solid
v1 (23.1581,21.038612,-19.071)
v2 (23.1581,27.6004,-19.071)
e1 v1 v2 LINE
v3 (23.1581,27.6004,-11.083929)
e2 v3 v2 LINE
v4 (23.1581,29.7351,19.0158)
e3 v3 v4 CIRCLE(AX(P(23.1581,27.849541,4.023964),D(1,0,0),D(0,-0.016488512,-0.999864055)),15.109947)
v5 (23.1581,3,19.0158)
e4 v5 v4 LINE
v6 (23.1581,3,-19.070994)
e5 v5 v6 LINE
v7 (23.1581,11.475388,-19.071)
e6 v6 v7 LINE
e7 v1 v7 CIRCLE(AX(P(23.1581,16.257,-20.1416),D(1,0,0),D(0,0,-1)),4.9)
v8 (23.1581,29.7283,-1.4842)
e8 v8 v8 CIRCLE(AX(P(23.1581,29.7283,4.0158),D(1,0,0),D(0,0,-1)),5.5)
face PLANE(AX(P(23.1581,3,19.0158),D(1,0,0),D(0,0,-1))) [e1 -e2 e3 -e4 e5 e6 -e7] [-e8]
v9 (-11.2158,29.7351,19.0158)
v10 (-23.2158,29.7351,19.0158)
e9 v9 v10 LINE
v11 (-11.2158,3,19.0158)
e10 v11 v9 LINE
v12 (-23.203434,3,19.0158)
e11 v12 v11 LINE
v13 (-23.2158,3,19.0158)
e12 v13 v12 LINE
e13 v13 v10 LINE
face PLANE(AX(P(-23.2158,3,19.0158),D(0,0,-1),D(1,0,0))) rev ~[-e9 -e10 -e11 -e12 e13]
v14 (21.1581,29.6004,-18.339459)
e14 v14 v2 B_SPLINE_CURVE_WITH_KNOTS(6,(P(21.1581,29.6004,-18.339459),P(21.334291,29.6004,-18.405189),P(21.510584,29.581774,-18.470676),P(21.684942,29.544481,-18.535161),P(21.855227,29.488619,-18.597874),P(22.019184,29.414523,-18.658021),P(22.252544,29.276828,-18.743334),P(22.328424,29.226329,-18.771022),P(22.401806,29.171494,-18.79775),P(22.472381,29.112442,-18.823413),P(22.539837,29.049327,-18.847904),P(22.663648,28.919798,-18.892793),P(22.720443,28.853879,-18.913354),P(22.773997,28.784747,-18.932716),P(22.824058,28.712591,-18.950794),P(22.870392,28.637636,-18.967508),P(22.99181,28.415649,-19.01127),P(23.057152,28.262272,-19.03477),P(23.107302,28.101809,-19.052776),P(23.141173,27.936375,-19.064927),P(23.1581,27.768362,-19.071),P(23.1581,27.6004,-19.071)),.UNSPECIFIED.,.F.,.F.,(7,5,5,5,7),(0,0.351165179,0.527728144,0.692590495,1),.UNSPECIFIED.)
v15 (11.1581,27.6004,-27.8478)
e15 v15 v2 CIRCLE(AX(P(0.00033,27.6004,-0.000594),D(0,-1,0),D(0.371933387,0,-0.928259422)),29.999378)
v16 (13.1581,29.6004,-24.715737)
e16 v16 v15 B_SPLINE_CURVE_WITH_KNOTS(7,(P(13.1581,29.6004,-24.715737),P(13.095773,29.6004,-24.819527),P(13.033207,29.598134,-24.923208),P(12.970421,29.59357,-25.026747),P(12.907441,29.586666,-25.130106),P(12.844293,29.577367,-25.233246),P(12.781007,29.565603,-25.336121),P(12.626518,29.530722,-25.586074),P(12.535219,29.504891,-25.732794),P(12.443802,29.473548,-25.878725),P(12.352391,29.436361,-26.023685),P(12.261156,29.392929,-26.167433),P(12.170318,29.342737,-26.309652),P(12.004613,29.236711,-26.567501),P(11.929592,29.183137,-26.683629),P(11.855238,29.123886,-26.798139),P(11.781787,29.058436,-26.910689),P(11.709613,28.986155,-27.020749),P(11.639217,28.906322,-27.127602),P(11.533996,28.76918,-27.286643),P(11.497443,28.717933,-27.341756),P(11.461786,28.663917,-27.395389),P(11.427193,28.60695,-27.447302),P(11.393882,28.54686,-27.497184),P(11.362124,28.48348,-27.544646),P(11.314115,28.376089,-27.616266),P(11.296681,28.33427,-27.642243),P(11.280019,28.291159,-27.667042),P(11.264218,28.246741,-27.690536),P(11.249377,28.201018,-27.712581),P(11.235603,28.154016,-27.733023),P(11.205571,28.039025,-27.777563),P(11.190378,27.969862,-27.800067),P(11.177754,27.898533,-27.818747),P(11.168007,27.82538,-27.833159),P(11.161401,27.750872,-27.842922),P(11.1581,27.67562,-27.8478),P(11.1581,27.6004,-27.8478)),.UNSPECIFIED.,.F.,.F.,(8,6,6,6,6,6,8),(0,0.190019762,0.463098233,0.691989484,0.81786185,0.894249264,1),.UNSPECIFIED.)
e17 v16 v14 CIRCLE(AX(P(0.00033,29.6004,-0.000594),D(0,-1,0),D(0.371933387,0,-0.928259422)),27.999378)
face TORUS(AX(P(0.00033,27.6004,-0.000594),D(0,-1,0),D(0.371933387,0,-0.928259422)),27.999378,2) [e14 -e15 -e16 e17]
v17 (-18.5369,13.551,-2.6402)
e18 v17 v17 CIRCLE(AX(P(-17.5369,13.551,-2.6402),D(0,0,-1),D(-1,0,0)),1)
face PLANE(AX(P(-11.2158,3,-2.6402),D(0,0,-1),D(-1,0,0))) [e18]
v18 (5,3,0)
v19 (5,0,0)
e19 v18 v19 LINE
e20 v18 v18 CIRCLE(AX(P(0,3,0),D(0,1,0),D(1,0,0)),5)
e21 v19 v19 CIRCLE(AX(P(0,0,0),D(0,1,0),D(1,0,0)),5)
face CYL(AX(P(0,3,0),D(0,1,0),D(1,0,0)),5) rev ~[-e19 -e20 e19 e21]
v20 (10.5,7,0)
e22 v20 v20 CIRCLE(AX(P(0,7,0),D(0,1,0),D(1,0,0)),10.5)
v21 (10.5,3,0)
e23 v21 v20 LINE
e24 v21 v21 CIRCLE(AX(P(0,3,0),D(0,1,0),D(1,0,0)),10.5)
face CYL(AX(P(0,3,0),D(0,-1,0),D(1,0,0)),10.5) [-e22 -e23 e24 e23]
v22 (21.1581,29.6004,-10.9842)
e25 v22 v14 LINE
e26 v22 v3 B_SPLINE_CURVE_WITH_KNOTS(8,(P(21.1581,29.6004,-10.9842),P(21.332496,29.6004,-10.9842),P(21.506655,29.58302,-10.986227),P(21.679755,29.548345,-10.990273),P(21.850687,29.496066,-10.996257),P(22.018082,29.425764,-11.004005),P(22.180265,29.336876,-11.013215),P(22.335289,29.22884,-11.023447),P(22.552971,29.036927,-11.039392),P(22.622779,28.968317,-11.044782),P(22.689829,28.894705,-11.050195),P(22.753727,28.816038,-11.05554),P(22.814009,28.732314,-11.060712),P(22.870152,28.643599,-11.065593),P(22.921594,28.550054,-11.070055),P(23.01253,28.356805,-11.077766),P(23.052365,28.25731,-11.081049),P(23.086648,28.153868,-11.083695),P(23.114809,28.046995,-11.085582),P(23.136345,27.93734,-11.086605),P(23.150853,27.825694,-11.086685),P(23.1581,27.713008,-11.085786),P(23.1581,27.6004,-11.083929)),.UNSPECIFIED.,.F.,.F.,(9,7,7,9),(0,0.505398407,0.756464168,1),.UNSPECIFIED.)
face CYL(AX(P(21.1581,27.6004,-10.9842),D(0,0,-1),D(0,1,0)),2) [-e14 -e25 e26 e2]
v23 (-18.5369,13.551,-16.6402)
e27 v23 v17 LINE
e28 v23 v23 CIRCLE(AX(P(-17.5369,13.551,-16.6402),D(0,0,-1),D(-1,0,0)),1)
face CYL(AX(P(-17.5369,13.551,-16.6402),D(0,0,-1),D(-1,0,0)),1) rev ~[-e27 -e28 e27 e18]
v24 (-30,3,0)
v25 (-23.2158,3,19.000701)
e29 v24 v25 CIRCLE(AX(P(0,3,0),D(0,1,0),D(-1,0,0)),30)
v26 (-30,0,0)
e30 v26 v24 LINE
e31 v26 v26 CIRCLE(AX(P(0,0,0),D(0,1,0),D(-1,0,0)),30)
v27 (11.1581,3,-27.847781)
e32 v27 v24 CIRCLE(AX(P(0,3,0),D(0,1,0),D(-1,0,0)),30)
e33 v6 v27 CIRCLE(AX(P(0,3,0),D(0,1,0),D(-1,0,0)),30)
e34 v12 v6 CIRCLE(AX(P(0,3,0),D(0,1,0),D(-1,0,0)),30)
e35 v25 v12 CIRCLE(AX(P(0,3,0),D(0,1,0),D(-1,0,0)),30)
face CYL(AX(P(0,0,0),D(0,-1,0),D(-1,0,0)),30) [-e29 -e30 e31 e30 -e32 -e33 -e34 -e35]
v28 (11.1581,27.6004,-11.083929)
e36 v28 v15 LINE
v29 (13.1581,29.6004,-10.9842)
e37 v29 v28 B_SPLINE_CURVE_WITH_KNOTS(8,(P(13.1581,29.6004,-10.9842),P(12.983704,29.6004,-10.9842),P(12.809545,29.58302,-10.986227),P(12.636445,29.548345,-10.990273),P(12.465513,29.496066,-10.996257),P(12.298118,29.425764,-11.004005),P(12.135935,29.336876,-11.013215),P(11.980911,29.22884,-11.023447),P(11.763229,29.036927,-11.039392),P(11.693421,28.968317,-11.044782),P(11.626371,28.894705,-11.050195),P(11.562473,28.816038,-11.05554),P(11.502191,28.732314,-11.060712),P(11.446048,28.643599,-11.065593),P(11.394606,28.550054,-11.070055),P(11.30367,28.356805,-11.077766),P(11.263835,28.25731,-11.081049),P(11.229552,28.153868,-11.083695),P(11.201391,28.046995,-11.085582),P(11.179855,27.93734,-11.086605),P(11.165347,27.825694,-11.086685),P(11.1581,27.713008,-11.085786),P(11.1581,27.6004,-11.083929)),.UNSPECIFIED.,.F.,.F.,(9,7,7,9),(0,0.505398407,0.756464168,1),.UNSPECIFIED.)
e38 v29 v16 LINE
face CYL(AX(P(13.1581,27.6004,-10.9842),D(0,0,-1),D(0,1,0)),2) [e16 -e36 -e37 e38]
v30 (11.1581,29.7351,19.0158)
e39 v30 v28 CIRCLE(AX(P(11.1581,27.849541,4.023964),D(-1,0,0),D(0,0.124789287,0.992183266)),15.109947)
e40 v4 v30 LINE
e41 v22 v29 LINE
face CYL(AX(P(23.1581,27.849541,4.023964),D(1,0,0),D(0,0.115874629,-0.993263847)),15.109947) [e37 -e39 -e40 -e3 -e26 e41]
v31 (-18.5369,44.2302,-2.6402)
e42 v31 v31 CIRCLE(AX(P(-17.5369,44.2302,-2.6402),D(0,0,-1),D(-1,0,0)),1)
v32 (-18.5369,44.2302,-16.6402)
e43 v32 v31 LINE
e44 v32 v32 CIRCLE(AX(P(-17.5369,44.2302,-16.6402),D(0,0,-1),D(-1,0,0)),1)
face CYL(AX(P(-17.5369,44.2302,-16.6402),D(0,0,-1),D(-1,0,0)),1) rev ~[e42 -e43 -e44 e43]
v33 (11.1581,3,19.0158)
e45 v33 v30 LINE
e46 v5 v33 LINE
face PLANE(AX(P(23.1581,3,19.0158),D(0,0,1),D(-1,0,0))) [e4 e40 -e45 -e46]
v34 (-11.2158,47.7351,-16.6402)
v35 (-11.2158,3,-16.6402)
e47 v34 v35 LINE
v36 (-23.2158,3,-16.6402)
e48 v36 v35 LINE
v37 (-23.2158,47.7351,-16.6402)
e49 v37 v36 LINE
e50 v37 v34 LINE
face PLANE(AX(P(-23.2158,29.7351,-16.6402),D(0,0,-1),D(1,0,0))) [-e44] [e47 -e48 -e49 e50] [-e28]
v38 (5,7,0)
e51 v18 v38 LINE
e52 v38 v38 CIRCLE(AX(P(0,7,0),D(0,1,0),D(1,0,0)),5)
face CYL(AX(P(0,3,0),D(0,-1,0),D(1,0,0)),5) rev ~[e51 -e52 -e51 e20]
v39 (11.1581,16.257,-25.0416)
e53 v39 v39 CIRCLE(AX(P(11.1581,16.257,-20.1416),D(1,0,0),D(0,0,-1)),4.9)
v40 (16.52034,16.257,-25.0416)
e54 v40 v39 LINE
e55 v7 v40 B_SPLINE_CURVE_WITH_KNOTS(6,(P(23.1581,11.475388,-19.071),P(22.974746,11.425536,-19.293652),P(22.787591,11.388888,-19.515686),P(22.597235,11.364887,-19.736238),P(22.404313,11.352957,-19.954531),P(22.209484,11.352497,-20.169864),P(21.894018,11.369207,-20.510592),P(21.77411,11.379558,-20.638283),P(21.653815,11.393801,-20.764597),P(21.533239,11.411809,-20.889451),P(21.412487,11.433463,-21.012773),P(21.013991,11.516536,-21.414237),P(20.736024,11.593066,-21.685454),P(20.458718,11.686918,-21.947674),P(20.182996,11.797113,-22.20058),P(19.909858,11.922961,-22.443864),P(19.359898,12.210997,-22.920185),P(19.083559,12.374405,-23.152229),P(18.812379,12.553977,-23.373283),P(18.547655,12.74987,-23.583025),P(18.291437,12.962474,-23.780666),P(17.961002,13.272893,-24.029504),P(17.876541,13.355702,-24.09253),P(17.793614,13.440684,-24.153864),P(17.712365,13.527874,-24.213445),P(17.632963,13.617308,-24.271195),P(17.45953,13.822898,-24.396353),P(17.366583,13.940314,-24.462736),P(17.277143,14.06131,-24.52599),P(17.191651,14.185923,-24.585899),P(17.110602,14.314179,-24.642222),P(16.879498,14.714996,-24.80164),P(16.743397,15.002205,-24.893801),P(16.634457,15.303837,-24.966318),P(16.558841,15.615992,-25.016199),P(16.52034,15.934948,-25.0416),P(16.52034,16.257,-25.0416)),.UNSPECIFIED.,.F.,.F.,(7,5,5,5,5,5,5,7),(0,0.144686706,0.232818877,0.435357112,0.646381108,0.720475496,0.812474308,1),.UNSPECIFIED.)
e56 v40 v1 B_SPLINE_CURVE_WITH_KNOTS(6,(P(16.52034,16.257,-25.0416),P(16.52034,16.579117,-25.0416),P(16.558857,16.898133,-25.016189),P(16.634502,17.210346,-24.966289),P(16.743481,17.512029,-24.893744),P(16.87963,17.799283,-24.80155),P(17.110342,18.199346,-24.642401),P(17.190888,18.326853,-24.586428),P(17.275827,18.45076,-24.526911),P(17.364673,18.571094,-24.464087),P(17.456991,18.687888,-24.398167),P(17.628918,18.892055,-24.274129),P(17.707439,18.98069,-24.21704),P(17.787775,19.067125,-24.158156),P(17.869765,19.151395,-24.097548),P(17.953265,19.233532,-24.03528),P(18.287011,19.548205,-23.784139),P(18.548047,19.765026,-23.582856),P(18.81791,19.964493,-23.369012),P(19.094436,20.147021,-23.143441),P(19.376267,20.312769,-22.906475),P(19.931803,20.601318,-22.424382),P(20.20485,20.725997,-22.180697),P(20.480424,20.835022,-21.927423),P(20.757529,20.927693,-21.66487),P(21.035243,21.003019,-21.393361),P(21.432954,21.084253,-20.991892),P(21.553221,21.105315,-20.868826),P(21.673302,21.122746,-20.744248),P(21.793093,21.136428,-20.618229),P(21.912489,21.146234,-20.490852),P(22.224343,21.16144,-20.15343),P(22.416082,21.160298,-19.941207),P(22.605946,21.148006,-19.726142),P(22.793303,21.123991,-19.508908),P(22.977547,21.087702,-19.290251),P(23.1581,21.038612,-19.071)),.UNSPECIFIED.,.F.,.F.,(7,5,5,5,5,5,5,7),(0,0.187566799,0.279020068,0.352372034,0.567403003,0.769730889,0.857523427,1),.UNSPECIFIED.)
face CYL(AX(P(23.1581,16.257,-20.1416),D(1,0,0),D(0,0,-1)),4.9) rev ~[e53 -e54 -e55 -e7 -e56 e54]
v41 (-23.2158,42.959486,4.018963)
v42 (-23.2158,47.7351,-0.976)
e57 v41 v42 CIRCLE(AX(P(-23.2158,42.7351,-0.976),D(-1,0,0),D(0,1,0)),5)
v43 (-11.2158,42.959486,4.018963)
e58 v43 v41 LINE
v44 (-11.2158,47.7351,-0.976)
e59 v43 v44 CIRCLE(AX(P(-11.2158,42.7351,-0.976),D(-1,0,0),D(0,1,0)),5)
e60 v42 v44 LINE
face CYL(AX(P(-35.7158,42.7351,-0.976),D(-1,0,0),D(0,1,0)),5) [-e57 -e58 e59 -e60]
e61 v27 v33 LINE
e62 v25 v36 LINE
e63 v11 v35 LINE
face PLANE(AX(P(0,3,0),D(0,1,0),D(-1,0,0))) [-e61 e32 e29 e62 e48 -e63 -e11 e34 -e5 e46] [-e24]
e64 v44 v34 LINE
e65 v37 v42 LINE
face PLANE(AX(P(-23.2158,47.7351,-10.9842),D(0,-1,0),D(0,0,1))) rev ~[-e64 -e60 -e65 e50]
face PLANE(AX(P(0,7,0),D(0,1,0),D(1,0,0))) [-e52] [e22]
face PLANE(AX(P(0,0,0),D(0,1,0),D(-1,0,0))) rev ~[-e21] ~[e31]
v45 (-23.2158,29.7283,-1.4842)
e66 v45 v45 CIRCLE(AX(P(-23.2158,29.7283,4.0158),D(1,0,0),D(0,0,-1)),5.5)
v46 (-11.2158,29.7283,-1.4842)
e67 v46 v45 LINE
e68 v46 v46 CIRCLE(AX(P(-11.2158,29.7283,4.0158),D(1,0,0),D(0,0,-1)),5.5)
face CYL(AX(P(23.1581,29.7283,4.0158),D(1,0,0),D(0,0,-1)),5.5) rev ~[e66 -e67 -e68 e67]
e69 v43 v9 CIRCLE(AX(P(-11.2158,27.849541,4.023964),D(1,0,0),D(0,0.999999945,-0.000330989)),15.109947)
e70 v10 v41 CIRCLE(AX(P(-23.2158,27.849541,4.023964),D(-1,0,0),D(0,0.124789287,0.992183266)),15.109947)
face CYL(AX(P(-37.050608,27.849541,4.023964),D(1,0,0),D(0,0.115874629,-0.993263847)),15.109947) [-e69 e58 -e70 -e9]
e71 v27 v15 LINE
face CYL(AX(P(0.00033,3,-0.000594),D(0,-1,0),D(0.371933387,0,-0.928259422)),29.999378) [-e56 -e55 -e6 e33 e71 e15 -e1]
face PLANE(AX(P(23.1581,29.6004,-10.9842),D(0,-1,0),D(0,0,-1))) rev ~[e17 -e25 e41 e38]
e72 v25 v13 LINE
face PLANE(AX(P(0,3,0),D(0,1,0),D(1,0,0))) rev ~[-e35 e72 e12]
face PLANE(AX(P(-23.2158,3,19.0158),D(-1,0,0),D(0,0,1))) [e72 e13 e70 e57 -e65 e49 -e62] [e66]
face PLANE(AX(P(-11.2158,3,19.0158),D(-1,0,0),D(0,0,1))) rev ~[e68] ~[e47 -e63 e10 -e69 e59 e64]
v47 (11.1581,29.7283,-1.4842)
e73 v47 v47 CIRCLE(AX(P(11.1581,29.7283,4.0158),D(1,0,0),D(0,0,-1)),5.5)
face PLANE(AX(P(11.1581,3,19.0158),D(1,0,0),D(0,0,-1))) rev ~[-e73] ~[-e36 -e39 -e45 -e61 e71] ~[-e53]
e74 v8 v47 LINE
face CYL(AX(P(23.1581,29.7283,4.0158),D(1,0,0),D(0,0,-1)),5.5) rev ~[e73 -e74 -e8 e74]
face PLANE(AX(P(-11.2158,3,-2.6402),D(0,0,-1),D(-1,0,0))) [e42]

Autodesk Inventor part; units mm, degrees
ref_plane "YZ Plane" through (0, 0, 0) normal (1, 0, 0) x (0, 1, 0)
ref_plane "XZ Plane" through (0, 0, 0) normal (0, 1, 0) x (-1, 0, 0)
ref_plane "XY Plane" through (0, 0, 0) normal (0, 0, 1) x (1, 0, 0)
sketch "Sketch1" plane through (0, 0, 0) normal (0, 1, 0) x (-1, 0, 0)
  circle A0 centre (0, 0) radius 30
  dimension "d0" = 60
extrude "Extrusion1" add sketch "Sketch1" along normal blind 3
sketch "Sketch2" plane through (0, 3, 0) normal (0, 1, 0) x (1, 0, 0)
  circle A0 centre (0, 0) radius 5
  dimension "d3" = 10
extrude "Extrusion2" cut sketch "Sketch2" against normal blind 4
sketch "Sketch4" plane through (0, 3, 0) normal (0, 1, 0) x (1, 0, 0)
  line L0 (-23.2158, -19.0158) -> (-11.2158, -19.0158)
  line L1 (-11.2158, -19.0158) -> (-11.2158, 10.9842)
  line L2 (-11.2158, 10.9842) -> (-23.2158, 10.9842)
  line L3 (-23.2158, 10.9842) -> (-23.2158, -19.0158)
  line L4 (-0.0289, -32.9889) -> (-0.0289, 43.4959) construction
  line L5 (23.1581, -19.0158) -> (11.1581, -19.0158)
  line L6 (11.1581, -19.0158) -> (11.1581, 10.9842)
  line L7 (11.1581, 10.9842) -> (23.1581, 10.9842)
  line L8 (23.1581, 10.9842) -> (23.1581, -19.0158)
  point P0 (0, -4.0158)
  point P1 (-23.2158, -4.0158)
  point P2 (23.2158, 0)
  dimension "d9" = 12
  dimension "d10" = 30
extrude "Extrusion4" add sketch "Sketch4" along normal blind 40
sketch "Sketch5" plane through (23.1581, 3, 19.0158) normal (1, 0, 0) x (0, 0, -1)
  line L0 (30, 0) -> (30, 40) projected
  line L1 (0, 0) -> (0, 40) projected
  arc A0 (30, 26.6004) -> (0, 26.7351) centre (14.9918, 24.8495) ccw
  line L2 (0, 26.7351) -> (0, 40)
  line L3 (30, 40) -> (0, 40) projected
  line L4 (30, 40) -> (30, 26.6004)
  point P0 (19.0158, -3)
extrude "Extrusion5" cut sketch "Sketch5" against normal blind 74.5
sketch "Sketch6" plane through (23.1581, 3, 19.0158) normal (1, 0, 0) x (0, 0, -1)
  circle A0 centre (15, 26.7283) radius 5.5
  point P0 (19.0158, -3)
  dimension "d15" = 11
extrude "Extrusion6" cut sketch "Sketch6" against normal blind 74.5
sketch "Sketch7" plane through (23.1581, 3, 19.0158) normal (1, 0, 0) x (0, 0, -1)
  line L0 (30, 0) -> (30, 26.6004) projected
  line L1 (30, 26.6004) -> (49.0158, 26.6004)
  line L2 (49.0158, 0) -> (-10.9842, 0) projected
  line L3 (49.0158, 26.6004) -> (49.0158, 0)
  point P0 (19.0158, -3)
  point P1 (0, 0)
  point P2 (0.0152, 0)
extrude "Extrusion7" add sketch "Sketch7" against normal blind 12
sketch "Sketch8" plane through (23.1581, 3, 19.0158) normal (1, 0, 0) x (0, 0, -1)
  circle A0 centre (39.1574, 13.257) radius 4.9
  point P0 (19.0158, -3)
  dimension "d20" = 9.8
extrude "Extrusion8" cut sketch "Sketch8" against normal blind 12
sketch "Sketch9" plane through (23.1581, 3, -30) normal (0, -1, 0) x (1, 0, 0)
  line L0 (-12, 0) -> (-12, 2.1522) projected
  arc A0 (-12, 2.1522) -> (0, 10.929) centre (-23.1581, 30) ccw projected
  arc A1 (-12, 2.1522) -> (0, 10.929) centre (-23.1408, 29.9763) ccw
  line L1 (0, 10.929) -> (0, 0) projected
  line L2 (0, 10.929) -> (0, 0)
  line L3 (0, 0) -> (-12, 0)
extrude "Extrusion9" cut sketch "Sketch9" against normal blind 33.25
fillet "Fillet1" radius 2 3 edges at (23.1581, 29.6004, -15.0276) (17.7109, 29.6004, -24.2152) (11.1581, 29.6004, -19.416)
sketch "Sketch10" plane through (-11.2158, 3, -10.9842) normal (0, 0, -1) x (-1, 0, 0)
  line L0 (0, 0) -> (0, 26.7351) projected
  line L1 (12, 0) -> (12, 26.7351) projected
  line L2 (0, 26.7351) -> (12, 26.7351)
  line L3 (12, 26.7351) -> (12, 0)
  line L4 (12, 0) -> (0, 0)
  line L5 (0, 0) -> (0, 26.7351)
  point P0 (-11.2158, -3)
extrude "Extrusion10" add sketch "Sketch10" along normal blind 5.656
sketch "Sketch11" plane through (-23.2158, 29.7351, -10.9842) normal (0, 1, 0) x (1, 0, 0)
  line L0 (12, -30) -> (12, 0) projected
  line L1 (0, -29.9848) -> (0, 5.656) projected
  line L2 (12, 0) -> (0, 0)
  line L3 (0, 0) -> (0, 5.656)
  line L4 (0, 5.656) -> (12, 5.656)
  line L5 (12, 5.656) -> (12, 0)
  point P0 (23.2158, -10.9842)
  point P1 (0, 0)
extrude "Extrusion11" add sketch "Sketch11" along normal blind 18
sketch "Sketch12" plane through (-23.2158, 3, 19.0158) normal (-1, 0, 0) x (0, 0, 1)
  line L0 (-30, 44.7351) -> (-30, 26.6004) projected
  line L1 (-30, 44.7351) -> (-14.9918, 44.7351)
  line L2 (-14.9918, 44.7351) -> (-14.9918, 39.9594)
  arc A0 (0, 26.7351) -> (-30.0997, 24.6004) centre (-14.9918, 24.8495) ccw projected
  point P0 (-19.0158, -3)
extrude "Extrusion12" add sketch "Sketch12" against normal blind 12
fillet "Fillet2" radius 5 1 edges at (-17.2158, 47.7351, 4.024)
sketch "Sketch13" plane through (-11.2158, 3, -16.6402) normal (0, 0, -1) x (-1, 0, 0)
  circle A0 centre (6.3211, 10.551) radius 1
  circle A1 centre (6.3211, 41.2302) radius 1
  point P0 (-11.2158, -3)
  dimension "d33" = 2
  dimension "d34" = 2
extrude "Extrusion13" cut sketch "Sketch13" against normal blind 14
sketch "Sketch15" plane through (0, 3, 0) normal (0, 1, 0) x (1, 0, 0)
  circle A0 centre (0, 0) radius 5 projected
  circle A1 centre (0, 0) radius 10.5
  circle A2 centre (0, 0) radius 5
  dimension "d39" = 21
extrude "Extrusion15" add sketch "Sketch15" along normal blind 4
properties part number "base2_3DPrint"
